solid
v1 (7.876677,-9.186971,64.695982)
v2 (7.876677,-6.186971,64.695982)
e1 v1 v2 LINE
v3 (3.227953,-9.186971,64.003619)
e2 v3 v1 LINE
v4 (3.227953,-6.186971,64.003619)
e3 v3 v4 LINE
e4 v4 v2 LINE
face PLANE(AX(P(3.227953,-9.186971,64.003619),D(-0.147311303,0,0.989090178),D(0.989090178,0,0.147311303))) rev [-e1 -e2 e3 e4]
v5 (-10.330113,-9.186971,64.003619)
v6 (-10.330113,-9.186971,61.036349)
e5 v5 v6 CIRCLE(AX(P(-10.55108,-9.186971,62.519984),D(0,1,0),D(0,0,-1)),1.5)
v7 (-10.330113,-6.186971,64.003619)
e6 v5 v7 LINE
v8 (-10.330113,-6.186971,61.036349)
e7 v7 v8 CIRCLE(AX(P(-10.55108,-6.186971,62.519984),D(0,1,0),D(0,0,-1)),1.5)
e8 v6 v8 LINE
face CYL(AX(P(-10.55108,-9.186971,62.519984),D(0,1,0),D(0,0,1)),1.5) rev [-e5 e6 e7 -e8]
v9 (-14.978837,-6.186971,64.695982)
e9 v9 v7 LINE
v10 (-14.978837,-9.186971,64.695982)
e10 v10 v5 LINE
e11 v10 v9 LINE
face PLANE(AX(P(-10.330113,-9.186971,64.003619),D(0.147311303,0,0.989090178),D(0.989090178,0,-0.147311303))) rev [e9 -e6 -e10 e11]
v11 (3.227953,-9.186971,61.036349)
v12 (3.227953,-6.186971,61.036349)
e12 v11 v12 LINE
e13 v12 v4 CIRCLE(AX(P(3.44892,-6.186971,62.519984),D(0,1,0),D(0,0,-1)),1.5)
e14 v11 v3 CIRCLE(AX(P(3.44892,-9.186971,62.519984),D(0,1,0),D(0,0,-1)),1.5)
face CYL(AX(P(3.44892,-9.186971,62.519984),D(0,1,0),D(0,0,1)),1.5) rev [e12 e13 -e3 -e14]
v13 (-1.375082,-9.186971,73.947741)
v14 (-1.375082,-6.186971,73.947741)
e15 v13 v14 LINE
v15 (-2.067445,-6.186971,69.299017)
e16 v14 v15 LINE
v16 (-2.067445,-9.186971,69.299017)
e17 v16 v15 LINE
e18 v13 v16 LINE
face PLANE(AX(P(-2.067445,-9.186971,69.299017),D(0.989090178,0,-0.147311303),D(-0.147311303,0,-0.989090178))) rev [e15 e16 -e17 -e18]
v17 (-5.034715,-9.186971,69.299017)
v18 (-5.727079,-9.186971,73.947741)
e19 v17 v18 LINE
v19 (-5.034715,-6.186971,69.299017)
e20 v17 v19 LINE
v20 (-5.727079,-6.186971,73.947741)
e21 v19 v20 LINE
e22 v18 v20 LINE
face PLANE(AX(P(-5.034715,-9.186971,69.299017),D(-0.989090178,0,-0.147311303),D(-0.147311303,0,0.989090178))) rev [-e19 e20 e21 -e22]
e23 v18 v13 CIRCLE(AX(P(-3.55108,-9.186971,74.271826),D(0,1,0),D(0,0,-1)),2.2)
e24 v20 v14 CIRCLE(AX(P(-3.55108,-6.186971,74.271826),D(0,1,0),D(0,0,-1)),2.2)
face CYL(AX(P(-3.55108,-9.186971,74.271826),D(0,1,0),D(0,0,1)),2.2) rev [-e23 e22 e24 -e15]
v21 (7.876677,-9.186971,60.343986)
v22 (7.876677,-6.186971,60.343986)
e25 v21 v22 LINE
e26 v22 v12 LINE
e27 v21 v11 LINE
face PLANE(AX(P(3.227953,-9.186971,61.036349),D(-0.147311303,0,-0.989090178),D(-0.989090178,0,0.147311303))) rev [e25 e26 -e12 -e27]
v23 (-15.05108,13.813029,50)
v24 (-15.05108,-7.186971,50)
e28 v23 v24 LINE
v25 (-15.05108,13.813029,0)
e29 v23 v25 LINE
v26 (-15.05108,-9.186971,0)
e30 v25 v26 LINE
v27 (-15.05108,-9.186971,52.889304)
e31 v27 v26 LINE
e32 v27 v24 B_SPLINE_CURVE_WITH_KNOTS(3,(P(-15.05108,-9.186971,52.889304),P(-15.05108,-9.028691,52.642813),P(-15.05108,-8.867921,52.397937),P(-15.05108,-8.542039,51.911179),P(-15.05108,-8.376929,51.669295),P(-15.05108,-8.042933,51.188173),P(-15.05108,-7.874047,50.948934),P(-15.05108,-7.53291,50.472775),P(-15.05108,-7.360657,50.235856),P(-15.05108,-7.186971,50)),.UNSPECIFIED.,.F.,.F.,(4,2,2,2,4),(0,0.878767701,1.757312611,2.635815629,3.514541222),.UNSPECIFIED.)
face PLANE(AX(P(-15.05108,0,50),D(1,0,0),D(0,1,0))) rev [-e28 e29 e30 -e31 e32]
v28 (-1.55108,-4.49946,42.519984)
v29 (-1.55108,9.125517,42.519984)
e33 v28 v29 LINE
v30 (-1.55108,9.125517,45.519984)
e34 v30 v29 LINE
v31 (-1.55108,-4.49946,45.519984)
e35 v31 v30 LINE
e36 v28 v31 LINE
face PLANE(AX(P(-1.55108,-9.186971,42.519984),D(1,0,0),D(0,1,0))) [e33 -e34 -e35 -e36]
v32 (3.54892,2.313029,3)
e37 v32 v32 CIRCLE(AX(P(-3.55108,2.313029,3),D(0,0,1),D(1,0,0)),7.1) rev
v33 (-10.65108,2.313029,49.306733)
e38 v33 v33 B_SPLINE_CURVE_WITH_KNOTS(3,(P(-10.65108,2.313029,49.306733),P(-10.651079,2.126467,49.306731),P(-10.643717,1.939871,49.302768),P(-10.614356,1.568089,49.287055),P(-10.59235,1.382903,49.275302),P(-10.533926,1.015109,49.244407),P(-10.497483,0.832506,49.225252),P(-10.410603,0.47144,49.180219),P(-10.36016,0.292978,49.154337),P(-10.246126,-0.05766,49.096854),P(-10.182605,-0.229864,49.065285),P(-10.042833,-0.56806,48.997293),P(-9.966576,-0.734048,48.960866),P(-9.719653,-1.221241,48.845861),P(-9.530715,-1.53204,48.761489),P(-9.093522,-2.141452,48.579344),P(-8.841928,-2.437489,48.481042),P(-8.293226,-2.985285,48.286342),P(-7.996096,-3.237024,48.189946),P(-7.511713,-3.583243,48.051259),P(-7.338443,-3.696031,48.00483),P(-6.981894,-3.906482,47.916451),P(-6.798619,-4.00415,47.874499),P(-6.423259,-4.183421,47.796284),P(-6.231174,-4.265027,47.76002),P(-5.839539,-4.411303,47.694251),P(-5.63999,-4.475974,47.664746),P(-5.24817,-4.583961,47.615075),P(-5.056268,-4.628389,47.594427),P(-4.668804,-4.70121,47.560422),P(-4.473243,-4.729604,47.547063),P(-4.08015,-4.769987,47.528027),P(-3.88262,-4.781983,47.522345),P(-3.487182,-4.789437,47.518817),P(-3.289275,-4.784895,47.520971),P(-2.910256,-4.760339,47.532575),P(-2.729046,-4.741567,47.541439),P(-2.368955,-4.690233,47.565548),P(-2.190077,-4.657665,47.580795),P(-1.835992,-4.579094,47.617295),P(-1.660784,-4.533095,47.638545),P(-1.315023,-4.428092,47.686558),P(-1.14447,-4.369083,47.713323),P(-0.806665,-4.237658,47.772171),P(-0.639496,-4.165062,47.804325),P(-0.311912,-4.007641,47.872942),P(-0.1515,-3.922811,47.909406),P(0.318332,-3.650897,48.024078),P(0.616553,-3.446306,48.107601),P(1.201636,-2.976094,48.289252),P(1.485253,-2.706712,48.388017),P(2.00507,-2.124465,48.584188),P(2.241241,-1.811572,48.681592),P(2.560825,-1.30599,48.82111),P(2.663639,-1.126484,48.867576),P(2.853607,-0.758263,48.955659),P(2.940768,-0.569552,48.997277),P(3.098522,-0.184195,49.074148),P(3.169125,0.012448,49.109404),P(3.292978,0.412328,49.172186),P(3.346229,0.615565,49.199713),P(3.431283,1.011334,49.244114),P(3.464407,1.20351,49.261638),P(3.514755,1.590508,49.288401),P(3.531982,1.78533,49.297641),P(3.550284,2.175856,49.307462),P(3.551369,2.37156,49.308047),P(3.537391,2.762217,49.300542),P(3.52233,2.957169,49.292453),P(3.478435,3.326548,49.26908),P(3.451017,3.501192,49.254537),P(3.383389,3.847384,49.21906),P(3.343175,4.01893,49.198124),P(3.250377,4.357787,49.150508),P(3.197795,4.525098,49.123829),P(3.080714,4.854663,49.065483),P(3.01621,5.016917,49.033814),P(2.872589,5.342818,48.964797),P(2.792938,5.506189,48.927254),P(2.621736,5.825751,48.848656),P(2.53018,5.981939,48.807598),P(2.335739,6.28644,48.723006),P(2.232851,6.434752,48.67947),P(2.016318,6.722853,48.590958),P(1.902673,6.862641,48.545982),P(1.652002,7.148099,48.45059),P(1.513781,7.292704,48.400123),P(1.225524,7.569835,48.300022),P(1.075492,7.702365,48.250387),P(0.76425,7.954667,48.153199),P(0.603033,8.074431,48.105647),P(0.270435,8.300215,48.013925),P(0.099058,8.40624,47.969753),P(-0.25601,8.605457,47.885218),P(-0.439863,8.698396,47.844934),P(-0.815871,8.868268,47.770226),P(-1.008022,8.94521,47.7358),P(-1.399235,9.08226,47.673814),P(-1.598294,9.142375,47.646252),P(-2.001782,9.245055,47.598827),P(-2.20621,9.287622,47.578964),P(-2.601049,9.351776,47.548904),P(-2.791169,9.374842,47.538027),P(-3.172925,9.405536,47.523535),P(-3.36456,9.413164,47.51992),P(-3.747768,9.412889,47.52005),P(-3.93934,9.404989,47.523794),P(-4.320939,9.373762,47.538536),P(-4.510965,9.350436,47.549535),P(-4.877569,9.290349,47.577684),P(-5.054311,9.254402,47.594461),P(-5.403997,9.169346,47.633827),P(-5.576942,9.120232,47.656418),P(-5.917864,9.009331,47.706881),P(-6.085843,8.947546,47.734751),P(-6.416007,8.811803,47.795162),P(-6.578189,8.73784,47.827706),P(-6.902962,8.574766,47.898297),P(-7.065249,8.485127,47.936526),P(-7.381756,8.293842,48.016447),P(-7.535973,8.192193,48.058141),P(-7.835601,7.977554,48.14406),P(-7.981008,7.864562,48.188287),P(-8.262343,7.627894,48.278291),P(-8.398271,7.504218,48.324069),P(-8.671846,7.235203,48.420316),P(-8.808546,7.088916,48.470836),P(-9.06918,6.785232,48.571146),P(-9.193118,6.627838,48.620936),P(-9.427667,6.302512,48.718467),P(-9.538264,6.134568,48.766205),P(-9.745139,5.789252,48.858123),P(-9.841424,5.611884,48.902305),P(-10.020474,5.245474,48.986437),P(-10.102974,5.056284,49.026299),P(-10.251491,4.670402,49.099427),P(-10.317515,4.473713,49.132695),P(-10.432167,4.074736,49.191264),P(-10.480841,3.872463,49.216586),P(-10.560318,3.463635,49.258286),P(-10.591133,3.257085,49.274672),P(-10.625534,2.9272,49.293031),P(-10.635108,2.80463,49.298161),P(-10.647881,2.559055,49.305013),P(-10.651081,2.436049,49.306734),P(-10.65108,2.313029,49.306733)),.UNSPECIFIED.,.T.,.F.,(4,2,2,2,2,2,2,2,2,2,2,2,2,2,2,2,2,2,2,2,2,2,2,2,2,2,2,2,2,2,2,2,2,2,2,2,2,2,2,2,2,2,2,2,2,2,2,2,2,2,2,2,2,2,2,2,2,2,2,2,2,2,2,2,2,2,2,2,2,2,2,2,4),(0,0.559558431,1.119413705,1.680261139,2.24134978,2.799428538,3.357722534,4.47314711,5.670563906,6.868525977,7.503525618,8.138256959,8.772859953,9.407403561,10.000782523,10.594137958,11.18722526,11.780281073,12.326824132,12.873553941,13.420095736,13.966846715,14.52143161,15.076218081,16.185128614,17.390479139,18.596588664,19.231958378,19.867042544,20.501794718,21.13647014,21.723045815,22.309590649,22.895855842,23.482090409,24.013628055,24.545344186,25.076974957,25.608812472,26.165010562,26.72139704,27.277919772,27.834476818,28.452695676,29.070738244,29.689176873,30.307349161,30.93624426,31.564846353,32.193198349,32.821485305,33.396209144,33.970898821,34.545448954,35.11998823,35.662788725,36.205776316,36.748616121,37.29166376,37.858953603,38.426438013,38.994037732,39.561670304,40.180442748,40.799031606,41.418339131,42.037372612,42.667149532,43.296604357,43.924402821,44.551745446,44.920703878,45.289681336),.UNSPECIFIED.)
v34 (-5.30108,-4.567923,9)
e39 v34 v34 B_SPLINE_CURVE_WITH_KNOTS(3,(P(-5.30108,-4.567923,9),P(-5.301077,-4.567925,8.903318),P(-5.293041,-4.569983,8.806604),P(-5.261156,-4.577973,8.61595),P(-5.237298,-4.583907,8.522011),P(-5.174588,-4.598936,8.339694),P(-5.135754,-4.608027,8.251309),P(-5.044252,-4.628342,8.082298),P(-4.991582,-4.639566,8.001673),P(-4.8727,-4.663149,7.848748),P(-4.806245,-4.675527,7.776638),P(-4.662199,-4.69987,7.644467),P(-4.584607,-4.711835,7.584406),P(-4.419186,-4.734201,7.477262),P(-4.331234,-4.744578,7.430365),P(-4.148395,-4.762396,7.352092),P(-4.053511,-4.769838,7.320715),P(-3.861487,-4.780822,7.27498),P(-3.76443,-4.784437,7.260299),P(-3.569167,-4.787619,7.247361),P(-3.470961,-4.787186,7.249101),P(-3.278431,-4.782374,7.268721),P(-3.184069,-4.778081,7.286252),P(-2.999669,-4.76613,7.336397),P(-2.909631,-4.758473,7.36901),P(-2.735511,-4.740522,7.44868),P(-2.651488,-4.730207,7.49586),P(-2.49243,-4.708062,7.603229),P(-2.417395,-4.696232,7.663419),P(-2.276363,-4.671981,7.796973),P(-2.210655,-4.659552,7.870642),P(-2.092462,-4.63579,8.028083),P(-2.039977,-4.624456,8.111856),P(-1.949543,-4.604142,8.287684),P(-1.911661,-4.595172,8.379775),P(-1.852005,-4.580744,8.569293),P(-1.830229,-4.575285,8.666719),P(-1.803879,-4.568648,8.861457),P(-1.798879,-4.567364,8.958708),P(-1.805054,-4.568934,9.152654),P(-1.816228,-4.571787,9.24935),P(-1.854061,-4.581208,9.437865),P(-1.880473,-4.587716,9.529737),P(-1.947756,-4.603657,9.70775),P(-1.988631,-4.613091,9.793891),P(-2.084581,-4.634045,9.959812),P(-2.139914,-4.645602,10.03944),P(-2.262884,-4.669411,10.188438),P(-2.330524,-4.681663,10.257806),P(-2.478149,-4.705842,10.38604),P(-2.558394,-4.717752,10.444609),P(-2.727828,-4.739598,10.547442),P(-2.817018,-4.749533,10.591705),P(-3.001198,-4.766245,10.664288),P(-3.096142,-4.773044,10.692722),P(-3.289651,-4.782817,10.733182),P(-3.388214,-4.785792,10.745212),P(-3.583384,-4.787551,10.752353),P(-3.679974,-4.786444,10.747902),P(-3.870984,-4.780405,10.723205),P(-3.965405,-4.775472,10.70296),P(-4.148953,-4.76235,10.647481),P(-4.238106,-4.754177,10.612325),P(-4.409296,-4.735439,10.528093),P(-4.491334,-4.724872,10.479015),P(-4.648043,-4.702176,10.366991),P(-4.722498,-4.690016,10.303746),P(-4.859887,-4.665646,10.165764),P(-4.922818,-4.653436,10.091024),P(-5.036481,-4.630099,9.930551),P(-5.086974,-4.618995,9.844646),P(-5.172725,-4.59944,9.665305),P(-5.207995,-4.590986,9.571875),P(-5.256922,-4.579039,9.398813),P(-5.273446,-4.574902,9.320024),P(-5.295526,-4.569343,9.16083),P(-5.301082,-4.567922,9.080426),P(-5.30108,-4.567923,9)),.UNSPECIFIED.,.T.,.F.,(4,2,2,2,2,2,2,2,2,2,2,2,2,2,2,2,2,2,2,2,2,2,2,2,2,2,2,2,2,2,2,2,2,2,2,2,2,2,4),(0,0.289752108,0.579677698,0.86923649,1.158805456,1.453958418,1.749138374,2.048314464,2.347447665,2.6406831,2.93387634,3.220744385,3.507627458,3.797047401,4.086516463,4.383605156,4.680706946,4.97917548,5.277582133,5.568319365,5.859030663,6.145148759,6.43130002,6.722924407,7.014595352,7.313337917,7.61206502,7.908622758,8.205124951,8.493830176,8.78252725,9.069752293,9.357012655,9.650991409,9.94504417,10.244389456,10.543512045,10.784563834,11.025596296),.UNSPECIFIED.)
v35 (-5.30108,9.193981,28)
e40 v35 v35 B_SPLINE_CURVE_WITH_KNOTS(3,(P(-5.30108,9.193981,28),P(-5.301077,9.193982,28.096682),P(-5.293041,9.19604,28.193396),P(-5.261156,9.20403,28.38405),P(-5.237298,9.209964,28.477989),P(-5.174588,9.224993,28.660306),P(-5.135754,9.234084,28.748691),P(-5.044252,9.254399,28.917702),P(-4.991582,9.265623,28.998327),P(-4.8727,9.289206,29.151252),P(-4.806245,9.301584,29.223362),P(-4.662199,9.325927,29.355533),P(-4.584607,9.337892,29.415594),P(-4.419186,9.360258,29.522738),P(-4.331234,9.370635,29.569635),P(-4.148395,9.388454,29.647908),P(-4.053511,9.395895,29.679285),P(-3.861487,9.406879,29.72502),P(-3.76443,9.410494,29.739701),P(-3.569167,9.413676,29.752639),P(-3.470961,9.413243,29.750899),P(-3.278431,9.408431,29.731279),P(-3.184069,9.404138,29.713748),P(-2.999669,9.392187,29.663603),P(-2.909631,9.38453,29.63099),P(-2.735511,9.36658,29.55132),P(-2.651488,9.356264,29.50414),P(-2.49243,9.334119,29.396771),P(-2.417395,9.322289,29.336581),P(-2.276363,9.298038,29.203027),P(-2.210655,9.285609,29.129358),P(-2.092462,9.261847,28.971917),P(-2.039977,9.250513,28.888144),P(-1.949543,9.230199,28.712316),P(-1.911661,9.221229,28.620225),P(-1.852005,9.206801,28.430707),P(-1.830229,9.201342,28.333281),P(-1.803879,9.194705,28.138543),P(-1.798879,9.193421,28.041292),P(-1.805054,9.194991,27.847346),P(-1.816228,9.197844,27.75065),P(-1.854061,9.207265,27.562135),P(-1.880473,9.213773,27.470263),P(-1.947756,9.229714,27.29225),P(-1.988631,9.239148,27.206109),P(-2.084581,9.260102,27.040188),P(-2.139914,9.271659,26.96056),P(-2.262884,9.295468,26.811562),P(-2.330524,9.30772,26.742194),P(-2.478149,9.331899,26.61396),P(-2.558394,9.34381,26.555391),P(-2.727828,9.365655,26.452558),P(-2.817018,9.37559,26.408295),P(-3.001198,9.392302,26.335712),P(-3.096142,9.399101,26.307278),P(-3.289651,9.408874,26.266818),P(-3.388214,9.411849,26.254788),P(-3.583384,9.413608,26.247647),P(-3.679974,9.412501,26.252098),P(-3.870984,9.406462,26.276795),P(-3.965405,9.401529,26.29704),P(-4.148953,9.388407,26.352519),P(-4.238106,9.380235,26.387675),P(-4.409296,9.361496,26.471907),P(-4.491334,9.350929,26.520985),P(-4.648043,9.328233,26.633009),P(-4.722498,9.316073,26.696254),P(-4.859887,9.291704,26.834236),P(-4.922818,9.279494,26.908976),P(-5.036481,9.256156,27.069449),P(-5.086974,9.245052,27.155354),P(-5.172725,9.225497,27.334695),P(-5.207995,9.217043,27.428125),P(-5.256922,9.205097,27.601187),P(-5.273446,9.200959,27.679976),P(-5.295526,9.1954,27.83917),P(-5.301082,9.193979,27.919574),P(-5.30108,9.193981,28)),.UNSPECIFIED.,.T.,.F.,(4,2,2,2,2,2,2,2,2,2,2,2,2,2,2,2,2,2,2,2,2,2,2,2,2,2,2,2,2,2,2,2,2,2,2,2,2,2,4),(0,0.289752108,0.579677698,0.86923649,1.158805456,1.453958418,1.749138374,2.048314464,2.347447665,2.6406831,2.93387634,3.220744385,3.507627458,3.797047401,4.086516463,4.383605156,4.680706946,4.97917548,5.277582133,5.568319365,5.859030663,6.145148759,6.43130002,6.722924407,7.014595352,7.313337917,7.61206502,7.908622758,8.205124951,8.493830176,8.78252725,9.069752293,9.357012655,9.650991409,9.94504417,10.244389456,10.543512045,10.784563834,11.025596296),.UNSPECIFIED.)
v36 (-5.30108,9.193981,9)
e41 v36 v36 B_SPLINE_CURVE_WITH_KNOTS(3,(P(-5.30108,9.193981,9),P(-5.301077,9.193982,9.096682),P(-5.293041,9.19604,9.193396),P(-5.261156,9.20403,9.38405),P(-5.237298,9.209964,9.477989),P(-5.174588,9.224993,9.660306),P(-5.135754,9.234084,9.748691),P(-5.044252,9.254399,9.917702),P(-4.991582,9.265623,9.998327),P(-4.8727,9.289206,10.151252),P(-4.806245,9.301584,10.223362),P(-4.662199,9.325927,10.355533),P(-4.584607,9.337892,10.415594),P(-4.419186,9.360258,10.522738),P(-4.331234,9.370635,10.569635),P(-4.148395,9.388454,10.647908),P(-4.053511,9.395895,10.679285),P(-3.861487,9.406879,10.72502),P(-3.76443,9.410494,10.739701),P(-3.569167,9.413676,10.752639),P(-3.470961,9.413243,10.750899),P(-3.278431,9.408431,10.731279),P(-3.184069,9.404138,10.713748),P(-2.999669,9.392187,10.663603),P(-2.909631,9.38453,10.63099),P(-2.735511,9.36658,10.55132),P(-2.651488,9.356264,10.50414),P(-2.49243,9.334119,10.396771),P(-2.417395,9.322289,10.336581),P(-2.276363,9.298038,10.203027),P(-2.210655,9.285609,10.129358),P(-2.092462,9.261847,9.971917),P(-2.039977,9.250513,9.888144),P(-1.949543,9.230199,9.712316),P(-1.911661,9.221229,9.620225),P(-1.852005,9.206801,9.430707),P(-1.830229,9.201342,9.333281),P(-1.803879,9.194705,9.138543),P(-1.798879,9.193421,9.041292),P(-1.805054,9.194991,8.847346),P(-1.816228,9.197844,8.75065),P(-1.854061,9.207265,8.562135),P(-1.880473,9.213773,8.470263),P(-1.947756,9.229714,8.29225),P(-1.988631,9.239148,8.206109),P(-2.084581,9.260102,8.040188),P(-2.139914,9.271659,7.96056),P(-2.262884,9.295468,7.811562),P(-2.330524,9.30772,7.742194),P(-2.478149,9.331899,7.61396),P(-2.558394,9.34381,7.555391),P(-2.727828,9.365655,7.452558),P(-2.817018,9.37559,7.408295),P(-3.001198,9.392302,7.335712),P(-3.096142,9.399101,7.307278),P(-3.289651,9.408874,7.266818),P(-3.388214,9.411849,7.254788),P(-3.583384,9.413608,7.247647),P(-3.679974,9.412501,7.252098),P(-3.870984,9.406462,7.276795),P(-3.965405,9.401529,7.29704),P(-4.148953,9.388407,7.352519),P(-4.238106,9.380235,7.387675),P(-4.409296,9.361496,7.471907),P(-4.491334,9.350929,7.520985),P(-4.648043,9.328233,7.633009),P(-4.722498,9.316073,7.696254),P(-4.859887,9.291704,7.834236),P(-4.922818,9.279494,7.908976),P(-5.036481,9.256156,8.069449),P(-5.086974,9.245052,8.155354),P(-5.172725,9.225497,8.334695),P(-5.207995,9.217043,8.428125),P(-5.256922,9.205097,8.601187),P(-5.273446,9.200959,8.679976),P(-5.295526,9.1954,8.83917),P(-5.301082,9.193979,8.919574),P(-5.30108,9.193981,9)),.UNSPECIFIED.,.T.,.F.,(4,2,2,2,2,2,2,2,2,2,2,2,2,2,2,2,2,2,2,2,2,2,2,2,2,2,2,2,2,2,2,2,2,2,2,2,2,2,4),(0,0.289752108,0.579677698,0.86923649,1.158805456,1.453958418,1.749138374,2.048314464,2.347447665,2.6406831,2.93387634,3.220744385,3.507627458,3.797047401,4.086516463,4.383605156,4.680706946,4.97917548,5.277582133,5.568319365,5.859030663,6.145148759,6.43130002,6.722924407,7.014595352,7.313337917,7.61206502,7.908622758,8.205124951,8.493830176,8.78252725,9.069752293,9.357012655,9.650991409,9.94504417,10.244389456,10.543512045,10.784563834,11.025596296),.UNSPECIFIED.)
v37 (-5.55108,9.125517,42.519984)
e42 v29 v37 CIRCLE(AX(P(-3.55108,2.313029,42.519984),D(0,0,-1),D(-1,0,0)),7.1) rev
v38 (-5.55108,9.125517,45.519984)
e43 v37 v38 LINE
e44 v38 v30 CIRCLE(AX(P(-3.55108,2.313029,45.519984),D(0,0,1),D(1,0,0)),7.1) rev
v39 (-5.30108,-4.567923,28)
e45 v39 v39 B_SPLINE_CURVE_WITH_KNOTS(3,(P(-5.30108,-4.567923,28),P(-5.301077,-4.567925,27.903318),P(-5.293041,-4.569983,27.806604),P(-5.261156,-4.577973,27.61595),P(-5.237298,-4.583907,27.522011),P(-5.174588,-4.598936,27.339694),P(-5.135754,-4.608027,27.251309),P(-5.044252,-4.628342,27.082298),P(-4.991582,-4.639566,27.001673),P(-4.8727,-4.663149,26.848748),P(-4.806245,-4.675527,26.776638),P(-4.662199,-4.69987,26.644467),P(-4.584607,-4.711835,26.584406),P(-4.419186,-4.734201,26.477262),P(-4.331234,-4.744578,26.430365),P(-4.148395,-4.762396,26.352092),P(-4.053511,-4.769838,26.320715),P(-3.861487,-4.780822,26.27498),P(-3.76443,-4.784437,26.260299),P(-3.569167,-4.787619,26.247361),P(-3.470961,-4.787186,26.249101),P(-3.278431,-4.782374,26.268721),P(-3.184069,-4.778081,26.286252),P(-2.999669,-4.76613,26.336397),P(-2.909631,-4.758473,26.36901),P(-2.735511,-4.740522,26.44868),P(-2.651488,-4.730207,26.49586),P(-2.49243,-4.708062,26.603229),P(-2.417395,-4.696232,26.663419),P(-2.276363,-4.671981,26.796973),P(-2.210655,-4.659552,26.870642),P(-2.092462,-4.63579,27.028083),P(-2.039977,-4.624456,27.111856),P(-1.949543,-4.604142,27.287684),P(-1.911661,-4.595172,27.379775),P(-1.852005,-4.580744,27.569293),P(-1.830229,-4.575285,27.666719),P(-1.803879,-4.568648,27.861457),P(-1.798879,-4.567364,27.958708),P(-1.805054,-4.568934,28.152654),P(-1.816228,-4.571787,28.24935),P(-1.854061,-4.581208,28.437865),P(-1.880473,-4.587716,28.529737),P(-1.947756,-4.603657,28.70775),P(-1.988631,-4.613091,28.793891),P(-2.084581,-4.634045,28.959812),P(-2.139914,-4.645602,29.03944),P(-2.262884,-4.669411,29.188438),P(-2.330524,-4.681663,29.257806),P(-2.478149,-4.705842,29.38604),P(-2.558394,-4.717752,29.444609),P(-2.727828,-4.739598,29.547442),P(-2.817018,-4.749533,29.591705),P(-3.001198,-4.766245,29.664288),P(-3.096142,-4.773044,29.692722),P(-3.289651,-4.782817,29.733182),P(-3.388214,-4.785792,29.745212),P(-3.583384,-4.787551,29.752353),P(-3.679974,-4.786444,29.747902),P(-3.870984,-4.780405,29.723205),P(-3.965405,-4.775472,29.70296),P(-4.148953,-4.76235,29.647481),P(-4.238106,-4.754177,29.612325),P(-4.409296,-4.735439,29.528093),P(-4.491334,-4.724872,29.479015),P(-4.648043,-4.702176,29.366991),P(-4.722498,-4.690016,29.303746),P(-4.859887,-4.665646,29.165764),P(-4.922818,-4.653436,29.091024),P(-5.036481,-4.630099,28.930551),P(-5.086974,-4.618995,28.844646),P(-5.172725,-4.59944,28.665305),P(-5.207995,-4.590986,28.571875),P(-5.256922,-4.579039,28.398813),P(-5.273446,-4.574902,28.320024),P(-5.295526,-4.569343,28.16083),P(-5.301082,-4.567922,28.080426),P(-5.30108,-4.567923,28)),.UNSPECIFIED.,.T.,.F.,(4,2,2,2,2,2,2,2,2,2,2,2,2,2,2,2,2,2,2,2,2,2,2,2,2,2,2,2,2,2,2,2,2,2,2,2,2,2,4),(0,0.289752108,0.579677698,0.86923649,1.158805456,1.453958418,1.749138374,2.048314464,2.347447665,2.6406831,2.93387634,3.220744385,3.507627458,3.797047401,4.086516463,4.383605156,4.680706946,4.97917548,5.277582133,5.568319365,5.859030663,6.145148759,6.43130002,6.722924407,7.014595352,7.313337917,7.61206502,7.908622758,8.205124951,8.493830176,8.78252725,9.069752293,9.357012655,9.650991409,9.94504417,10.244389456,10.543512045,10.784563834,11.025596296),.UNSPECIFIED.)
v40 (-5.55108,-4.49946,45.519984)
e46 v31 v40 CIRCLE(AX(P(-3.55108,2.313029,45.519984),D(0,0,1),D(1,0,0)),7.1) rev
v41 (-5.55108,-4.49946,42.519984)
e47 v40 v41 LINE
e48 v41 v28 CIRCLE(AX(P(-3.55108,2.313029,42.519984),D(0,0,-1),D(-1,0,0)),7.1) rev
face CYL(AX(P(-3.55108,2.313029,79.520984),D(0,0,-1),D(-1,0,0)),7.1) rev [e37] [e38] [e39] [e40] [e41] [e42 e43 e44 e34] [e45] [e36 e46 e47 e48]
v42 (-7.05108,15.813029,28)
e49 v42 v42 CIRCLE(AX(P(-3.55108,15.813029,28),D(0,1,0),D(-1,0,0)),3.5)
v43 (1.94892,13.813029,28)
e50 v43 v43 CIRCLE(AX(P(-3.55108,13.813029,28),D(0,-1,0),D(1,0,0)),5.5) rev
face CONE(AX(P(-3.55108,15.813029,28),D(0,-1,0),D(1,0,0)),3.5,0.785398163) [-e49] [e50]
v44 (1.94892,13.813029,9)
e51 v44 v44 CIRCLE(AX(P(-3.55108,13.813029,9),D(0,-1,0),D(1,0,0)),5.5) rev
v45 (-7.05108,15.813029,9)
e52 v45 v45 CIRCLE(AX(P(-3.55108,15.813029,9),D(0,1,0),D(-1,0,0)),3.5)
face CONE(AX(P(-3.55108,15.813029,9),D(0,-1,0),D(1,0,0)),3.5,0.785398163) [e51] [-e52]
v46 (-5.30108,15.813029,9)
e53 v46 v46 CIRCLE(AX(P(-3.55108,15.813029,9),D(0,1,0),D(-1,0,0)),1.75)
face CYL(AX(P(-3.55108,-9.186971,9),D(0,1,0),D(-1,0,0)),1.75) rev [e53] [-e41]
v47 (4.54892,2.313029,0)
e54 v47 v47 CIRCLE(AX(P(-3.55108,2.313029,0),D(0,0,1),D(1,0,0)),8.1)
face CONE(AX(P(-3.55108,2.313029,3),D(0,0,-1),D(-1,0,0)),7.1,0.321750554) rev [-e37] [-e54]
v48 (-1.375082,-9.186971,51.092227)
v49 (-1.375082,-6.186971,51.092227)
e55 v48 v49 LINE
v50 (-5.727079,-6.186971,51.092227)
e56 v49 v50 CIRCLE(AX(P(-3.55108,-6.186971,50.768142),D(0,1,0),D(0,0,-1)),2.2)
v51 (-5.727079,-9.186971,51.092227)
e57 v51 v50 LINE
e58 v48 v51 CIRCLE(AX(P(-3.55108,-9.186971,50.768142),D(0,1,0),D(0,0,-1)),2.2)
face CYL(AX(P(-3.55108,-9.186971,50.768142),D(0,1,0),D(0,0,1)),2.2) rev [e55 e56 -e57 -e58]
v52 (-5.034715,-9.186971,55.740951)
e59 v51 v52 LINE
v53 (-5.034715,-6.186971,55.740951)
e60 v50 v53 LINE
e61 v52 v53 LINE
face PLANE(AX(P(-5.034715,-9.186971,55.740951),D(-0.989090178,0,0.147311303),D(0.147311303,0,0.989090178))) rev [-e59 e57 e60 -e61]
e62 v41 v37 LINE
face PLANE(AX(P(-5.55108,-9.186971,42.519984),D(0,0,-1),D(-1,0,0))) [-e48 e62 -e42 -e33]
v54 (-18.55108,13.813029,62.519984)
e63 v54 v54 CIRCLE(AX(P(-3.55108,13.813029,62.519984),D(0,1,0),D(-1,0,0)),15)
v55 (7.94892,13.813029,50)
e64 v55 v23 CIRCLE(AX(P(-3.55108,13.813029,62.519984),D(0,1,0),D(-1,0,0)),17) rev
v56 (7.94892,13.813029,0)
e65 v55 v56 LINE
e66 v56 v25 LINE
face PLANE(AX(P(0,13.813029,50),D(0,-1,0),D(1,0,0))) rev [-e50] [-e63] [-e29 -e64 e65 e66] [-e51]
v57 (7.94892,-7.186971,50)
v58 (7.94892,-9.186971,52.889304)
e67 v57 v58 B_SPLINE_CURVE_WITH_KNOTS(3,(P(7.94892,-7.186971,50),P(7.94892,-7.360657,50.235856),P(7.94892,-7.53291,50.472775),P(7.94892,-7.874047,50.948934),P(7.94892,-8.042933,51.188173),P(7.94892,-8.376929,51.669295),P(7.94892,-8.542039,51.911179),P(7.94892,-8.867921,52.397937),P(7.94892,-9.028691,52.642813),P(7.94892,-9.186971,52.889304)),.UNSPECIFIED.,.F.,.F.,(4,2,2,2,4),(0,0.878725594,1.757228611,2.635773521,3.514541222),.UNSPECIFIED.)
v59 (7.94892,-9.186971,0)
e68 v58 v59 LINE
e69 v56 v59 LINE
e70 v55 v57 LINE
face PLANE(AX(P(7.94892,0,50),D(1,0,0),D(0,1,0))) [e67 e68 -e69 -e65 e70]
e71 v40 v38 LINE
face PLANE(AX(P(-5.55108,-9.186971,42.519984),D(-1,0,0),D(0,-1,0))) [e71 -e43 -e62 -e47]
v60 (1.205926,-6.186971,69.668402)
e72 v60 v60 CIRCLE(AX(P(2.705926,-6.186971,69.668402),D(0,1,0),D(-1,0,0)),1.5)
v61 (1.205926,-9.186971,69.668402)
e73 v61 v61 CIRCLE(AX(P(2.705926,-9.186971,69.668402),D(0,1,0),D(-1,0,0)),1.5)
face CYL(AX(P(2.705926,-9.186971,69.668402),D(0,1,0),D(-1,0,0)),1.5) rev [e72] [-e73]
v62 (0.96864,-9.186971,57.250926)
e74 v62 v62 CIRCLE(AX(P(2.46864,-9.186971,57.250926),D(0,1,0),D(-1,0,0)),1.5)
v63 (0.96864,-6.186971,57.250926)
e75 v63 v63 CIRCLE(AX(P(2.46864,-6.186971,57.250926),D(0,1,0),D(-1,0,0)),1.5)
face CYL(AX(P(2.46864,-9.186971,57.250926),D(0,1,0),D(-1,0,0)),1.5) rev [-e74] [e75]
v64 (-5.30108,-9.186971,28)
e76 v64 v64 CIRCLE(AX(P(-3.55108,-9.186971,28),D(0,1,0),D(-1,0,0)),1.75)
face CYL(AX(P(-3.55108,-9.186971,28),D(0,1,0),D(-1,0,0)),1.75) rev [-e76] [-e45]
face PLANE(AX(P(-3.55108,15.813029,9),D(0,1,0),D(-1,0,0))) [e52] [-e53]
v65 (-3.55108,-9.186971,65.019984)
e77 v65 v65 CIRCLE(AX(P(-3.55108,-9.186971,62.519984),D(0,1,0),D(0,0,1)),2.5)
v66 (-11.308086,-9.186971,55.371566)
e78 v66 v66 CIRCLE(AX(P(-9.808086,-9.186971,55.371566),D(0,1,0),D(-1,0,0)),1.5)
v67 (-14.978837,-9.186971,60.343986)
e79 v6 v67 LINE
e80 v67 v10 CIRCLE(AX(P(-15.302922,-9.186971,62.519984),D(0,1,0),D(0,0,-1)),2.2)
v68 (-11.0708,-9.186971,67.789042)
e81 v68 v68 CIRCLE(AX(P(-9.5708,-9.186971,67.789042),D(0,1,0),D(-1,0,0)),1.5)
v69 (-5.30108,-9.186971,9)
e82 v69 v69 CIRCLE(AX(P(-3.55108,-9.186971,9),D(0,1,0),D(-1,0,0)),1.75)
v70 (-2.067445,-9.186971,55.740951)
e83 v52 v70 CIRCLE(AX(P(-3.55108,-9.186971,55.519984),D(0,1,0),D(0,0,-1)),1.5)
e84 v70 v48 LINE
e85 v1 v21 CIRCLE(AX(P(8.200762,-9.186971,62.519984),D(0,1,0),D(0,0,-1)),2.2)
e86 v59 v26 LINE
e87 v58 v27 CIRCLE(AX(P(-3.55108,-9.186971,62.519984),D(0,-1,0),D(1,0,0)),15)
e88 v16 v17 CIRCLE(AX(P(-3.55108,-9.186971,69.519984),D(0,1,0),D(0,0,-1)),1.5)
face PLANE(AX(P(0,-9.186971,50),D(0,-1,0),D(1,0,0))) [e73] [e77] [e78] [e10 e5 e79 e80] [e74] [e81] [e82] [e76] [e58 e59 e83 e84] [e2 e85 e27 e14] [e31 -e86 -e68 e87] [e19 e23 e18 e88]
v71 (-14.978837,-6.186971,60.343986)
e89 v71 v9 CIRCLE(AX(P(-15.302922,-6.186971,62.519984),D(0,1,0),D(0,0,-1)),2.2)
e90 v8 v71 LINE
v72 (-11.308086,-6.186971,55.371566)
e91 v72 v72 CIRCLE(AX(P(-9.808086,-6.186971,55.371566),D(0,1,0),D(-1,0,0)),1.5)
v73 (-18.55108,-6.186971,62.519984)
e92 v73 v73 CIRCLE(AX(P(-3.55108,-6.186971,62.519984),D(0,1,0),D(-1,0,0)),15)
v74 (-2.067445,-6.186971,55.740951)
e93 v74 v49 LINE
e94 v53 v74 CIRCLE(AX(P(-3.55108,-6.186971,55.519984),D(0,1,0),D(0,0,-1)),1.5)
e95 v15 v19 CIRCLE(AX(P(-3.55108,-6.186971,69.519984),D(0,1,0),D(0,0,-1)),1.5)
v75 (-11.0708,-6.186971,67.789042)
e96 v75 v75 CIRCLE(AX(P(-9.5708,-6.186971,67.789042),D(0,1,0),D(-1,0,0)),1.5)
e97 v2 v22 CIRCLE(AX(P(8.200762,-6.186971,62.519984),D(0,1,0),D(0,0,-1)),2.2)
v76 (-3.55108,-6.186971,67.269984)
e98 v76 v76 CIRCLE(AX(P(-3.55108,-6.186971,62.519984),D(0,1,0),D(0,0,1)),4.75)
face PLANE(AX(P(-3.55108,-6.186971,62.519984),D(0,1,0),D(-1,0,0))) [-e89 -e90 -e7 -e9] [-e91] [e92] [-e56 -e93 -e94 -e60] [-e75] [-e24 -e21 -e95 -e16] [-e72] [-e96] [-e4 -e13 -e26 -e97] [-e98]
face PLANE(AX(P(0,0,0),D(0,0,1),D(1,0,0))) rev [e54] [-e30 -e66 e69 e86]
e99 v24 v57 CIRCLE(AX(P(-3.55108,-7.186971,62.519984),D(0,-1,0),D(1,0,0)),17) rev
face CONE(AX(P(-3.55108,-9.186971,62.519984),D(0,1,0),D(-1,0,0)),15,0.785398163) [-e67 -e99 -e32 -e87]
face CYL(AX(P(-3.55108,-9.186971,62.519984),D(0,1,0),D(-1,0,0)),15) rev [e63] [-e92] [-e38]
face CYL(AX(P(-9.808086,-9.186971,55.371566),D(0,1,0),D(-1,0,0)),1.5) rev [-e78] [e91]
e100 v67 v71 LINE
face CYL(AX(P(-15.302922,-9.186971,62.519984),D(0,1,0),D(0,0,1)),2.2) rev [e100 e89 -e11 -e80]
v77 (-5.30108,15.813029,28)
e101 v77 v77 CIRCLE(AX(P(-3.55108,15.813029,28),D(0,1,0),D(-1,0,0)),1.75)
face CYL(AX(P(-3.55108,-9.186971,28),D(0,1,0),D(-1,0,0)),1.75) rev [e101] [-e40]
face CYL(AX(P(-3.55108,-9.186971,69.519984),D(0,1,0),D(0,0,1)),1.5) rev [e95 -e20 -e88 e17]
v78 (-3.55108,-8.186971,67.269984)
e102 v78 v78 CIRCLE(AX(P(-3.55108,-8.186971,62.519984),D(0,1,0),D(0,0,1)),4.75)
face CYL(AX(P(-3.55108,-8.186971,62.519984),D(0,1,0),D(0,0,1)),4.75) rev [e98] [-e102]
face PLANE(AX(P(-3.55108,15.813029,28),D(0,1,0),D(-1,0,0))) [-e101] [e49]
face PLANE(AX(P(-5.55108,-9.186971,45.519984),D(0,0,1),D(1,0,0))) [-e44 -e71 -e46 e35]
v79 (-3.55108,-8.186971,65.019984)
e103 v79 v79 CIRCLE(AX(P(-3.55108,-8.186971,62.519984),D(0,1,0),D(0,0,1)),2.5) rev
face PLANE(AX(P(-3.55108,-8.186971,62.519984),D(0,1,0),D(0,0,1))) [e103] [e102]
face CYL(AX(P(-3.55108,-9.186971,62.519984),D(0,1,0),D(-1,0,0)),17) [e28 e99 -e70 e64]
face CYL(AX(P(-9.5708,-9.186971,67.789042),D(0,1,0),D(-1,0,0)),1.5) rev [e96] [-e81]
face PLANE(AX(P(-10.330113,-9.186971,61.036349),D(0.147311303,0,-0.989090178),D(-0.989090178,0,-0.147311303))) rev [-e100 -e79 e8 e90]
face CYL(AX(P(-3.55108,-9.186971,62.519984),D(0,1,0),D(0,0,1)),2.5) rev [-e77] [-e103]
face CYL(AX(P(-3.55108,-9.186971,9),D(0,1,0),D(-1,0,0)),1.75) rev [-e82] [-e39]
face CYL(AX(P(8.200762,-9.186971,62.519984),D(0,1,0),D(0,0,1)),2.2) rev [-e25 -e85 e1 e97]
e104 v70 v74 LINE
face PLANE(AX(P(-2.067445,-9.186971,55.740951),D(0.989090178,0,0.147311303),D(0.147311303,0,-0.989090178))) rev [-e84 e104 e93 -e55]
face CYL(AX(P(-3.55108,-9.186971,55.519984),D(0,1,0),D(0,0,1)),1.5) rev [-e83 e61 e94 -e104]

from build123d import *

# Parameters (mm, degrees)
SCHIZZO1_W                     = 23
SCHIZZO1_H                     = 23
ESTRUSIONE_ESTRUSIONE1_DEPTH   = 50
SCHIZZO3_R                     = 17
TAGLIO_ESTRUSIONE2_DEPTH       = 58.057295879
SCHIZZO4_R                     = 17
SCHIZZO4_R_2                   = 15
ESTRUSIONE_ESTRUSIONE2_DEPTH   = 23
ESTRUSIONE_ESTRUSIONE3_START   = -2
SCHIZZO6_R                     = 15
ESTRUSIONE_ESTRUSIONE3_DEPTH   = 2
ESTRUSIONE_ESTRUSIONE4_START   = 1
SCHIZZO11_R                    = 15
ESTRUSIONE_ESTRUSIONE4_DEPTH   = 1
SMUSSO2_SIZE                   = 2
SCHIZZO12_R                    = 2.5
TAGLIO_ESTRUSIONE6_DEPTH       = 85.53268453
SCHIZZO13_R                    = 4.75
TAGLIO_ESTRUSIONE7_DEPTH       = 2
SCHIZZO14_R                    = 1.5
TAGLIO_ESTRUSIONE9_DEPTH       = 85.53268453
TAGLIO_ESTRUSIONE11_DEPTH      = 85.53268453
TAGLIO_ESTRUSIONE12_REACH      = 85.286
TAGLIO_ESTRUSIONE12_END_RADIUS = 15
SCHIZZO18_R                    = 7.1
ESTRUSIONE_ESTRUSIONE5_REACH   = 87.292
SCHIZZO19_W                    = 4
SCHIZZO19_H                    = 3
SCHIZZO21_R                    = 5.5
ESTRUSIONE_ESTRUSIONE6_DEPTH   = 2
SCHIZZO20_R                    = 1.75
TAGLIO_ESTRUSIONE13_DEPTH      = 86.853216328
SMUSSO3_SIZE                   = 2
SMUSSO4_SIZE                   = 1
SMUSSO4_SIZE2                  = 3


with BuildPart() as part:
    # Schizzo1 → Estrusione-Estrusione1 (new body)
    with BuildSketch(Plane.XY):
        with Locations((-3.551080126, 2.313028552)):
            Rectangle(SCHIZZO1_W, SCHIZZO1_H)
    extrude(amount=ESTRUSIONE_ESTRUSIONE1_DEPTH)

    # Schizzo3 → Taglio-Estrusione2 (cut, through all)
    with BuildSketch(Plane(origin=(0, 13.813028552, 0), x_dir=(1, 0, 0), z_dir=(0, 1, 0))):
        with Locations((-3.551080126, -62.519984026)):
            Circle(SCHIZZO3_R)
    extrude(amount=-TAGLIO_ESTRUSIONE2_DEPTH, mode=Mode.SUBTRACT)

    # Schizzo4 → Estrusione-Estrusione2 (add, through all)
    with BuildSketch(Plane(origin=(0, 13.813028552, 0), x_dir=(1, 0, 0), z_dir=(0, 1, 0))):
        with Locations((-3.551080126, -62.519984026)):
            Circle(SCHIZZO4_R)
        with Locations(Location((-3.551080126, -62.519984026, 0), (0, 0, 180))):
            Circle(SCHIZZO4_R_2, mode=Mode.SUBTRACT)
    extrude(amount=-ESTRUSIONE_ESTRUSIONE2_DEPTH)

    # Schizzo6 → Estrusione-Estrusione3 (add)
    with BuildSketch(Plane.XZ.offset(9.186971448).offset(ESTRUSIONE_ESTRUSIONE3_START)):
        with Locations(Location((-3.551080126, 62.519984026, 0), (0, 0, 180))):
            Circle(SCHIZZO6_R)
    extrude(amount=ESTRUSIONE_ESTRUSIONE3_DEPTH)

    # Schizzo11 → Estrusione-Estrusione4 (add)
    with BuildSketch(Plane(origin=(0, -7.186971448, 0), x_dir=(1, 0, 0), z_dir=(0, 1, 0)).offset(ESTRUSIONE_ESTRUSIONE4_START)):
        with Locations(Location((-3.551080126, -62.519984026, 0), (0, 0, 180))):
            Circle(SCHIZZO11_R)
    extrude(amount=-ESTRUSIONE_ESTRUSIONE4_DEPTH)

    # Smusso2
    smusso2_edges = [part.edges().sort_by_distance(p)[0] for p in [
        (-3.551080126, -9.186971448, 79.519984026),
    ]]
    chamfer(smusso2_edges, length=SMUSSO2_SIZE)

    # Schizzo12 → Taglio-Estrusione6 (cut, through all)
    with BuildSketch(Plane(origin=(0, -6.186971448, 0), x_dir=(1, 0, 0), z_dir=(0, 1, 0))):
        with Locations(Location((-3.551080126, -62.519984026, 0), (0, 0, 270))):
            Circle(SCHIZZO12_R)
    extrude(amount=-TAGLIO_ESTRUSIONE6_DEPTH, mode=Mode.SUBTRACT)

    # Schizzo13 → Taglio-Estrusione7 (cut)
    with BuildSketch(Plane(origin=(0, -6.186971448, 0), x_dir=(1, 0, 0), z_dir=(0, 1, 0))):
        with Locations(Location((-3.551080126, -62.519984026, 0), (0, 0, 270))):
            Circle(SCHIZZO13_R)
    extrude(amount=-TAGLIO_ESTRUSIONE7_DEPTH, mode=Mode.SUBTRACT)

    # Schizzo14 → Taglio-Estrusione9 (cut, through all)
    with BuildSketch(Plane(origin=(0, -6.186971448, 0), x_dir=(1, 0, 0), z_dir=(0, 1, 0))):
        with Locations(Location((-9.808086042, -55.37156623, 0), (0, 0, 180))):
            Circle(SCHIZZO14_R)
        with Locations(Location((2.705925789, -69.668401821, 0), (0, 0, 180))):
            Circle(SCHIZZO14_R)
        with Locations(Location((-9.570800375, -67.789041638, 0), (0, 0, 180))):
            Circle(SCHIZZO14_R)
        with Locations(Location((2.468640122, -57.250926413, 0), (0, 0, 180))):
            Circle(SCHIZZO14_R)
    extrude(amount=-TAGLIO_ESTRUSIONE9_DEPTH, mode=Mode.SUBTRACT)

    # Schizzo17 → Taglio-Estrusione11 (cut, through all)
    with BuildSketch(Plane(origin=(0, -6.186971448, 0), x_dir=(1, 0, 0), z_dir=(0, 1, 0))):
        with BuildLine():
            Line((-5.034715393, -69.299017071), (-5.727078518, -73.947740907))
            ThreePointArc((-5.727078518, -73.947740907), (-3.551080126, -76.471825774), (-1.375081735, -73.947740907))
            Line((-1.375081735, -73.947740907), (-2.06744486, -69.299017071))
            ThreePointArc((-2.06744486, -69.299017071), (-3.551080126, -68.019984026), (-5.034715393, -69.299017071))
        make_face()
        with BuildLine():
            Line((3.227952919, -64.003619292), (7.876676755, -64.695982417))
            ThreePointArc((7.876676755, -64.695982417), (10.400761622, -62.519984026), (7.876676755, -60.343985634))
            Line((7.876676755, -60.343985634), (3.227952919, -61.036348759))
            ThreePointArc((3.227952919, -61.036348759), (1.948919874, -62.519984026), (3.227952919, -64.003619292))
        make_face()
        with BuildLine():
            Line((-10.330113172, -61.036348759), (-14.978837008, -60.343985634))
            ThreePointArc((-14.978837008, -60.343985634), (-17.502921875, -62.519984026), (-14.978837008, -64.695982417))
            Line((-14.978837008, -64.695982417), (-10.330113172, -64.003619292))
            ThreePointArc((-10.330113172, -64.003619292), (-9.051080126, -62.519984026), (-10.330113172, -61.036348759))
        make_face()
        with BuildLine():
            Line((-2.06744486, -55.74095098), (-1.375081735, -51.092227144))
            ThreePointArc((-1.375081735, -51.092227144), (-3.551080126, -48.568142277), (-5.727078518, -51.092227144))
            Line((-5.727078518, -51.092227144), (-5.034715393, -55.74095098))
            ThreePointArc((-5.034715393, -55.74095098), (-3.551080126, -57.019984026), (-2.06744486, -55.74095098))
        make_face()
    extrude(amount=-TAGLIO_ESTRUSIONE11_DEPTH, mode=Mode.SUBTRACT)

    # Taglio-Estrusione12: up to this cylinder (the profile starts outside it)
    taglio_estrusione12_end = Plane(origin=(-3.551080126, 2.313029, 62.519984026), z_dir=(0, 1, 0)) * Cylinder(TAGLIO_ESTRUSIONE12_END_RADIUS, 201.572, mode=Mode.PRIVATE)
    # Schizzo18 → Taglio-Estrusione12 (cut, up to the surface)
    with BuildSketch(Plane(origin=(0, 0, 0), x_dir=(-1, 0, 0), z_dir=(0, 0, -1)), mode=Mode.PRIVATE) as taglio_estrusione12_sk1:
        with Locations((3.551080126, 2.313028552)):
            Circle(SCHIZZO18_R)
    taglio_estrusione12_tool1 = extrude(taglio_estrusione12_sk1.sketch, amount=-TAGLIO_ESTRUSIONE12_REACH, mode=Mode.PRIVATE) - taglio_estrusione12_end
    add(taglio_estrusione12_tool1.solids().sort_by_distance((-3.55108, 2.313029, 0))[0], mode=Mode.SUBTRACT)

    # Schizzo19 → Estrusione-Estrusione5 (add, up to next)
    with BuildSketch(Plane(origin=(0, 13.813028552, 0), x_dir=(1, 0, 0), z_dir=(0, 1, 0)), mode=Mode.PRIVATE) as estrusione_estrusione5_sk1:
        with Locations((-3.551080126, -44.019984026)):
            Rectangle(SCHIZZO19_W, SCHIZZO19_H)
    estrusione_estrusione5_tool1 = extrude(estrusione_estrusione5_sk1.sketch, amount=-ESTRUSIONE_ESTRUSIONE5_REACH, mode=Mode.PRIVATE) - part.part
    add(estrusione_estrusione5_tool1.solids().sort_by_distance((-3.55108, 13.813029, 44.019984))[0])

    # Schizzo21 → Estrusione-Estrusione6 (add)
    with BuildSketch(Plane(origin=(0, 13.813028552, 0), x_dir=(1, 0, 0), z_dir=(0, 1, 0))):
        with Locations((-3.551080126, -9)):
            Circle(SCHIZZO21_R)
        with Locations((-3.551080126, -28)):
            Circle(SCHIZZO21_R)
    extrude(amount=ESTRUSIONE_ESTRUSIONE6_DEPTH)

    # Schizzo20 → Taglio-Estrusione13 (cut, through all)
    with BuildSketch(Plane(origin=(0, 15.813028552, 0), x_dir=(1, 0, 0), z_dir=(0, 1, 0))):
        with Locations(Location((-3.551080126, -9, 0), (0, 0, 180))):
            Circle(SCHIZZO20_R)
        with Locations(Location((-3.551080126, -28, 0), (0, 0, 180))):
            Circle(SCHIZZO20_R)
    extrude(amount=-TAGLIO_ESTRUSIONE13_DEPTH, mode=Mode.SUBTRACT)

    # Smusso3
    smusso3_edges = [part.edges().sort_by_distance(p)[0] for p in [
        (-9.051080126, 15.813028552, 9),
        (-9.051080126, 15.813028552, 28),
    ]]
    chamfer(smusso3_edges, length=SMUSSO3_SIZE - 0.0001)  # a hair under: the kernel refuses the full size

    # Smusso4
    smusso4_edges = [part.edges().sort_by_distance(p)[0] for p in [
        (3.548919874, 2.313028552, 0),
    ]]
    smusso4_side = [part.faces().sort_by_distance(p)[0] for p in [
        (-3.551080126, 13.487759433, 0),
    ]]
    chamfer(smusso4_edges, length=SMUSSO4_SIZE, length2=SMUSSO4_SIZE2, reference=smusso4_side[0])


solid = part.part
